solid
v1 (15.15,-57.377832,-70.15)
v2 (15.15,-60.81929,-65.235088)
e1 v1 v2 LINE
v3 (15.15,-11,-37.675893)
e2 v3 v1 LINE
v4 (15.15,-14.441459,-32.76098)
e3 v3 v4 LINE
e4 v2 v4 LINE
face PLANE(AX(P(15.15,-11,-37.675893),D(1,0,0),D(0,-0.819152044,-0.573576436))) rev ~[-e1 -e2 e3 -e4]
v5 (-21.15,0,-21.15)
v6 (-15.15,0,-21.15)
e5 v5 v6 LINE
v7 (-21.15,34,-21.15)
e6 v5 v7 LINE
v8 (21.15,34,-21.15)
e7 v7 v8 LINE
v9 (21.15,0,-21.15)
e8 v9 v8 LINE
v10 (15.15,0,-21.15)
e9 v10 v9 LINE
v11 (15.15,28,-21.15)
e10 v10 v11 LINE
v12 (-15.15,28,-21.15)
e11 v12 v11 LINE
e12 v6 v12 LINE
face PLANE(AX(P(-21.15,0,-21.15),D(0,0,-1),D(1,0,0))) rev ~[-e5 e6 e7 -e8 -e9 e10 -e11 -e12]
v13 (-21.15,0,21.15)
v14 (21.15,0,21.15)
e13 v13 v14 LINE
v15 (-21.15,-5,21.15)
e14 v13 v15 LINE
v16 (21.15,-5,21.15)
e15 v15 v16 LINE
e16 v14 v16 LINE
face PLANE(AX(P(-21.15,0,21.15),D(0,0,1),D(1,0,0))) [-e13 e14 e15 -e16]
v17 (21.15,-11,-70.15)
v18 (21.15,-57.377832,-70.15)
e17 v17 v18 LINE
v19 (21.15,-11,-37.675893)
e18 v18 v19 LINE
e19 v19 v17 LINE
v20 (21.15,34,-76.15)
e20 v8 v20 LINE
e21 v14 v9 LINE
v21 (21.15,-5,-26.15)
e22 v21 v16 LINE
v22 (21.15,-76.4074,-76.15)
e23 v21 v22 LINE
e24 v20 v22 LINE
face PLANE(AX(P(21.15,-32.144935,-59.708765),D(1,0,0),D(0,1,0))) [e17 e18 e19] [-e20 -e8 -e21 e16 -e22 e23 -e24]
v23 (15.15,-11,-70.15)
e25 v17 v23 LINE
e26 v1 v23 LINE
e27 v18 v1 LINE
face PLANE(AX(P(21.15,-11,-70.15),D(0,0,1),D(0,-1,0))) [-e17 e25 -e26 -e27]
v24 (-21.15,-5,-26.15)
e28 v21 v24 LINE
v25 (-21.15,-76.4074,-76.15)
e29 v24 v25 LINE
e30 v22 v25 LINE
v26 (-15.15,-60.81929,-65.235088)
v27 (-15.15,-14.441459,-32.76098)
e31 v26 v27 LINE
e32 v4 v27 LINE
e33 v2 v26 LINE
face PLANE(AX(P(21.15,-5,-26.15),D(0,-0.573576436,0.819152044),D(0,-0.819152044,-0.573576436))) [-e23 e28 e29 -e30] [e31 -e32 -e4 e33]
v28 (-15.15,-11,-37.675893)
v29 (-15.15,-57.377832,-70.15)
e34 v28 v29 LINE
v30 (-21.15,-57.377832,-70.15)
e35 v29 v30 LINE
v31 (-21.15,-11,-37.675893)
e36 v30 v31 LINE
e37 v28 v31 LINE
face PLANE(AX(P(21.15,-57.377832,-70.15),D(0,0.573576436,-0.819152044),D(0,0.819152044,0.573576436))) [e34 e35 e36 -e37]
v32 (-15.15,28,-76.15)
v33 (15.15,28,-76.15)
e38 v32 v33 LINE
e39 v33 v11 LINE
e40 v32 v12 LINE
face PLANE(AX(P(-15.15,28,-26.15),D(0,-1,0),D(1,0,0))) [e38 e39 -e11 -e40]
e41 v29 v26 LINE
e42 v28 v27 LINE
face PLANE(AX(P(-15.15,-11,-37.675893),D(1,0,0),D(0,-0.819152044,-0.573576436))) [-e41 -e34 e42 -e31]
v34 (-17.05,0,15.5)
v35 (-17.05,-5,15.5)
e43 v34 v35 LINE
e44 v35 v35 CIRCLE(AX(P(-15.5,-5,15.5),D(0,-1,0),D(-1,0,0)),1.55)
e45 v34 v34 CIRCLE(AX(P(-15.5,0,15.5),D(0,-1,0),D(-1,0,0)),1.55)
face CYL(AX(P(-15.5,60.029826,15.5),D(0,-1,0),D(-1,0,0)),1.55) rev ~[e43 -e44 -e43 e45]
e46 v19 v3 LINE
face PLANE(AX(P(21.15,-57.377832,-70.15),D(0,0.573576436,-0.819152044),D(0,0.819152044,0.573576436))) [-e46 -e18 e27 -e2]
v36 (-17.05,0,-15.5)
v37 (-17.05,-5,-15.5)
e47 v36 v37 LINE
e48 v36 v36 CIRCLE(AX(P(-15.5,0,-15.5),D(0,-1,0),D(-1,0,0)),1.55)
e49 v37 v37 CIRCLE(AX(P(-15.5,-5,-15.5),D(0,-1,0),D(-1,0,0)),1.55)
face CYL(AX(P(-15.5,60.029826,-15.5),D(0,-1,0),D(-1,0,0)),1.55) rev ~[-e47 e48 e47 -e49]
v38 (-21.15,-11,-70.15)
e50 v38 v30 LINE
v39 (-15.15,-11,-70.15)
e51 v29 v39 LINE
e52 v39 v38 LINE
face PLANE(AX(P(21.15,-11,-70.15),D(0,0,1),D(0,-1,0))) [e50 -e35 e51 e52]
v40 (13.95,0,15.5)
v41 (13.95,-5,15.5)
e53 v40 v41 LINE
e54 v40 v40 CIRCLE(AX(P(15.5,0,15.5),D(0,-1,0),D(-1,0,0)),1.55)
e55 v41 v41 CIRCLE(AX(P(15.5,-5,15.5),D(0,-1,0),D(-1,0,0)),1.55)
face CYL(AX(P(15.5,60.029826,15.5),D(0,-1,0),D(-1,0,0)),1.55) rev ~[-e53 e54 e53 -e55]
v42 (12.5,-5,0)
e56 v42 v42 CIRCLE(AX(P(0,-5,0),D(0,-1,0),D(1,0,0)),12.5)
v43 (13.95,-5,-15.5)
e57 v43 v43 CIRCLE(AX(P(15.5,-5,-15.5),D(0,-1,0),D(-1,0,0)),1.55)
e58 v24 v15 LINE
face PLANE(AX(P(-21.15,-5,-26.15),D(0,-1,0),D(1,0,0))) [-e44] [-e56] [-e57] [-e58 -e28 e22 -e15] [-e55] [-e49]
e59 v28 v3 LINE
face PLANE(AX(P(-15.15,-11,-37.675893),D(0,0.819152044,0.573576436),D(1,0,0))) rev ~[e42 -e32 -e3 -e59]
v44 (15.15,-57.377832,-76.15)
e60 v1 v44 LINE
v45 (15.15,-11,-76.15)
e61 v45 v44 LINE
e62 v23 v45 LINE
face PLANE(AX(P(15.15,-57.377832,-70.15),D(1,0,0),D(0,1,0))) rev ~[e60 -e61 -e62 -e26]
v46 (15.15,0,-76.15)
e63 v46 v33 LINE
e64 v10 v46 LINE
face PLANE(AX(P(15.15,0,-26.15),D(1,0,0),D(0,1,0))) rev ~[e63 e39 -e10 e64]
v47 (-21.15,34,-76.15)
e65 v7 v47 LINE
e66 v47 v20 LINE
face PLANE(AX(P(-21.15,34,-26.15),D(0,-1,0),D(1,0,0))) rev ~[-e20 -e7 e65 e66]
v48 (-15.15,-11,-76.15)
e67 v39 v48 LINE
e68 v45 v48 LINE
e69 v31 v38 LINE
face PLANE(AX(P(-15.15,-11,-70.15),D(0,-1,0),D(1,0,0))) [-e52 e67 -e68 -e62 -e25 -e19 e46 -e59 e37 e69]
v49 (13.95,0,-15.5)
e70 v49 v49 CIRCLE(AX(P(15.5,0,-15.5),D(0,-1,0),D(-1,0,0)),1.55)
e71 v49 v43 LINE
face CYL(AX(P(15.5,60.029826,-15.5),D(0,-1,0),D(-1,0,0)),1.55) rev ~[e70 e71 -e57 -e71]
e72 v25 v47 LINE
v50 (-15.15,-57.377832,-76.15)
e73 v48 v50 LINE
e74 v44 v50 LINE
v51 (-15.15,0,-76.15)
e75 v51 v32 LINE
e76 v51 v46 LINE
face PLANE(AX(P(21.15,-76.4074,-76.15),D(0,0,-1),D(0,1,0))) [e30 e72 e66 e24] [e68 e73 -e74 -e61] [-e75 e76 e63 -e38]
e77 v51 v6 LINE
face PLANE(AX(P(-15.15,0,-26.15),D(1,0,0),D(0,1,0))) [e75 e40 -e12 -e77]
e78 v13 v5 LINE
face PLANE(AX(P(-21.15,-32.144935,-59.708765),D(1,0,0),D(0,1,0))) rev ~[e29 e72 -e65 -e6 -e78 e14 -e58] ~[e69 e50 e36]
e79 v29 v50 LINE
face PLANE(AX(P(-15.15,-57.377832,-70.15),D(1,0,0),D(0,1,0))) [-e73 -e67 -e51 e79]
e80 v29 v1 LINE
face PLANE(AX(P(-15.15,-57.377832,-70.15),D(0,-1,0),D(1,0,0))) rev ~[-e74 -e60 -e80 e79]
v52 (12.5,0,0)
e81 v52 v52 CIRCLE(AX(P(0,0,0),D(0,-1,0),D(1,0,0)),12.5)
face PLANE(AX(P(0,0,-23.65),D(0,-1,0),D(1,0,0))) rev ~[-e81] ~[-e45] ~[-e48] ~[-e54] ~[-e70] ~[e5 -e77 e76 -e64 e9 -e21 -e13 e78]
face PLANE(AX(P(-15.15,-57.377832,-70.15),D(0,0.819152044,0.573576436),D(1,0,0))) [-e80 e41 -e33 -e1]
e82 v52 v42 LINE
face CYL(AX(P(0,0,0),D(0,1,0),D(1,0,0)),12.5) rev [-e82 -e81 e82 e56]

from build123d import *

# Parameters (mm, degrees)
F0_W      = 42.3
F0_H      = 42.3
F0_R      = 12.5
F1_DEPTH  = 5
F2_D      = 3.1
F0_H_2    = 5
F3_DEPTH  = 5
F4_DEPTH  = 34
F5_W      = 30.3
F5_H      = 28
F6_DEPTH  = 5
F7_DEPTH  = 50
F9_DEPTH  = 42.3
F10_W     = 30.3
F10_H     = 56.616878205
F11_DEPTH = 25
F12_W     = 30.3
F12_H     = 46.3778315229
F13_DEPTH = 25


with BuildPart() as f1:
    # F0 (on Front) → F1 (new body)
    with BuildSketch(Plane.XZ):
        Rectangle(F0_W, F0_H)
        Circle(F0_R, mode=Mode.SUBTRACT)
    extrude(amount=F1_DEPTH)

    # F2 (through all)
    with Locations(Plane(origin=(0, 0, 0), x_dir=(1, 0, 0), z_dir=(0, 1, 0))):
        with Locations((-15.5, -15.5), (-15.5, 15.5), (15.5, 15.5), (15.5, -15.5)):
            Hole(F2_D / 2)

    # F0 (on Front) → F3 (join)
    with BuildSketch(Plane.XZ):
        with Locations((0, -23.65)):
            Rectangle(F0_W, F0_H_2)
    extrude(amount=F3_DEPTH)

    # F0 (on Front) → F4 (join)
    with BuildSketch(Plane.XZ):
        with Locations((0, -23.65)):
            Rectangle(F0_W, F0_H_2)
    extrude(amount=-F4_DEPTH)

    # F5 (on face) → F6 (cut)
    with BuildSketch(Plane.XY.offset(-21.15)):
        with Locations((0, 14)):
            Rectangle(F5_W, F5_H)
    extrude(amount=-F6_DEPTH, mode=Mode.SUBTRACT)

    # F7 (add): a face of the model
    f7_faces = [f1.faces().sort_by_distance(p)[0] for p in [
        (0, -4.4246488029, -26.15),
    ]]
    extrude(f7_faces, amount=F7_DEPTH)

    # F8 (on face) → F9 (join)
    with BuildSketch(Plane.YZ.offset(21.15)):
        Polygon((-76.4074003371, -76.15), (-5, -76.15), (-5, -26.15), align=None)
        Polygon((-57.3778315229, -70.15), (-11, -37.6758927618), (-11, -70.15), align=None, mode=Mode.SUBTRACT)
    extrude(amount=-F9_DEPTH)

    # F10 (on face) → F11 (cut)
    with BuildSketch(Plane(origin=(0, 14.0829899932, -20.1125940878), x_dir=(1, 0, 0), z_dir=(0, 0.5735764364, -0.8191520443))):
        with Locations((0, 58.9291158964)):
            Rectangle(F10_W, F10_H)
    extrude(amount=-F11_DEPTH, mode=Mode.SUBTRACT)

    # F12 (on face) → F13 (cut)
    with BuildSketch(Plane.XY.offset(-70.15)):
        with Locations((0, -34.1889157615)):
            Rectangle(F12_W, F12_H)
    extrude(amount=-F13_DEPTH, mode=Mode.SUBTRACT)


solid = f1.part
